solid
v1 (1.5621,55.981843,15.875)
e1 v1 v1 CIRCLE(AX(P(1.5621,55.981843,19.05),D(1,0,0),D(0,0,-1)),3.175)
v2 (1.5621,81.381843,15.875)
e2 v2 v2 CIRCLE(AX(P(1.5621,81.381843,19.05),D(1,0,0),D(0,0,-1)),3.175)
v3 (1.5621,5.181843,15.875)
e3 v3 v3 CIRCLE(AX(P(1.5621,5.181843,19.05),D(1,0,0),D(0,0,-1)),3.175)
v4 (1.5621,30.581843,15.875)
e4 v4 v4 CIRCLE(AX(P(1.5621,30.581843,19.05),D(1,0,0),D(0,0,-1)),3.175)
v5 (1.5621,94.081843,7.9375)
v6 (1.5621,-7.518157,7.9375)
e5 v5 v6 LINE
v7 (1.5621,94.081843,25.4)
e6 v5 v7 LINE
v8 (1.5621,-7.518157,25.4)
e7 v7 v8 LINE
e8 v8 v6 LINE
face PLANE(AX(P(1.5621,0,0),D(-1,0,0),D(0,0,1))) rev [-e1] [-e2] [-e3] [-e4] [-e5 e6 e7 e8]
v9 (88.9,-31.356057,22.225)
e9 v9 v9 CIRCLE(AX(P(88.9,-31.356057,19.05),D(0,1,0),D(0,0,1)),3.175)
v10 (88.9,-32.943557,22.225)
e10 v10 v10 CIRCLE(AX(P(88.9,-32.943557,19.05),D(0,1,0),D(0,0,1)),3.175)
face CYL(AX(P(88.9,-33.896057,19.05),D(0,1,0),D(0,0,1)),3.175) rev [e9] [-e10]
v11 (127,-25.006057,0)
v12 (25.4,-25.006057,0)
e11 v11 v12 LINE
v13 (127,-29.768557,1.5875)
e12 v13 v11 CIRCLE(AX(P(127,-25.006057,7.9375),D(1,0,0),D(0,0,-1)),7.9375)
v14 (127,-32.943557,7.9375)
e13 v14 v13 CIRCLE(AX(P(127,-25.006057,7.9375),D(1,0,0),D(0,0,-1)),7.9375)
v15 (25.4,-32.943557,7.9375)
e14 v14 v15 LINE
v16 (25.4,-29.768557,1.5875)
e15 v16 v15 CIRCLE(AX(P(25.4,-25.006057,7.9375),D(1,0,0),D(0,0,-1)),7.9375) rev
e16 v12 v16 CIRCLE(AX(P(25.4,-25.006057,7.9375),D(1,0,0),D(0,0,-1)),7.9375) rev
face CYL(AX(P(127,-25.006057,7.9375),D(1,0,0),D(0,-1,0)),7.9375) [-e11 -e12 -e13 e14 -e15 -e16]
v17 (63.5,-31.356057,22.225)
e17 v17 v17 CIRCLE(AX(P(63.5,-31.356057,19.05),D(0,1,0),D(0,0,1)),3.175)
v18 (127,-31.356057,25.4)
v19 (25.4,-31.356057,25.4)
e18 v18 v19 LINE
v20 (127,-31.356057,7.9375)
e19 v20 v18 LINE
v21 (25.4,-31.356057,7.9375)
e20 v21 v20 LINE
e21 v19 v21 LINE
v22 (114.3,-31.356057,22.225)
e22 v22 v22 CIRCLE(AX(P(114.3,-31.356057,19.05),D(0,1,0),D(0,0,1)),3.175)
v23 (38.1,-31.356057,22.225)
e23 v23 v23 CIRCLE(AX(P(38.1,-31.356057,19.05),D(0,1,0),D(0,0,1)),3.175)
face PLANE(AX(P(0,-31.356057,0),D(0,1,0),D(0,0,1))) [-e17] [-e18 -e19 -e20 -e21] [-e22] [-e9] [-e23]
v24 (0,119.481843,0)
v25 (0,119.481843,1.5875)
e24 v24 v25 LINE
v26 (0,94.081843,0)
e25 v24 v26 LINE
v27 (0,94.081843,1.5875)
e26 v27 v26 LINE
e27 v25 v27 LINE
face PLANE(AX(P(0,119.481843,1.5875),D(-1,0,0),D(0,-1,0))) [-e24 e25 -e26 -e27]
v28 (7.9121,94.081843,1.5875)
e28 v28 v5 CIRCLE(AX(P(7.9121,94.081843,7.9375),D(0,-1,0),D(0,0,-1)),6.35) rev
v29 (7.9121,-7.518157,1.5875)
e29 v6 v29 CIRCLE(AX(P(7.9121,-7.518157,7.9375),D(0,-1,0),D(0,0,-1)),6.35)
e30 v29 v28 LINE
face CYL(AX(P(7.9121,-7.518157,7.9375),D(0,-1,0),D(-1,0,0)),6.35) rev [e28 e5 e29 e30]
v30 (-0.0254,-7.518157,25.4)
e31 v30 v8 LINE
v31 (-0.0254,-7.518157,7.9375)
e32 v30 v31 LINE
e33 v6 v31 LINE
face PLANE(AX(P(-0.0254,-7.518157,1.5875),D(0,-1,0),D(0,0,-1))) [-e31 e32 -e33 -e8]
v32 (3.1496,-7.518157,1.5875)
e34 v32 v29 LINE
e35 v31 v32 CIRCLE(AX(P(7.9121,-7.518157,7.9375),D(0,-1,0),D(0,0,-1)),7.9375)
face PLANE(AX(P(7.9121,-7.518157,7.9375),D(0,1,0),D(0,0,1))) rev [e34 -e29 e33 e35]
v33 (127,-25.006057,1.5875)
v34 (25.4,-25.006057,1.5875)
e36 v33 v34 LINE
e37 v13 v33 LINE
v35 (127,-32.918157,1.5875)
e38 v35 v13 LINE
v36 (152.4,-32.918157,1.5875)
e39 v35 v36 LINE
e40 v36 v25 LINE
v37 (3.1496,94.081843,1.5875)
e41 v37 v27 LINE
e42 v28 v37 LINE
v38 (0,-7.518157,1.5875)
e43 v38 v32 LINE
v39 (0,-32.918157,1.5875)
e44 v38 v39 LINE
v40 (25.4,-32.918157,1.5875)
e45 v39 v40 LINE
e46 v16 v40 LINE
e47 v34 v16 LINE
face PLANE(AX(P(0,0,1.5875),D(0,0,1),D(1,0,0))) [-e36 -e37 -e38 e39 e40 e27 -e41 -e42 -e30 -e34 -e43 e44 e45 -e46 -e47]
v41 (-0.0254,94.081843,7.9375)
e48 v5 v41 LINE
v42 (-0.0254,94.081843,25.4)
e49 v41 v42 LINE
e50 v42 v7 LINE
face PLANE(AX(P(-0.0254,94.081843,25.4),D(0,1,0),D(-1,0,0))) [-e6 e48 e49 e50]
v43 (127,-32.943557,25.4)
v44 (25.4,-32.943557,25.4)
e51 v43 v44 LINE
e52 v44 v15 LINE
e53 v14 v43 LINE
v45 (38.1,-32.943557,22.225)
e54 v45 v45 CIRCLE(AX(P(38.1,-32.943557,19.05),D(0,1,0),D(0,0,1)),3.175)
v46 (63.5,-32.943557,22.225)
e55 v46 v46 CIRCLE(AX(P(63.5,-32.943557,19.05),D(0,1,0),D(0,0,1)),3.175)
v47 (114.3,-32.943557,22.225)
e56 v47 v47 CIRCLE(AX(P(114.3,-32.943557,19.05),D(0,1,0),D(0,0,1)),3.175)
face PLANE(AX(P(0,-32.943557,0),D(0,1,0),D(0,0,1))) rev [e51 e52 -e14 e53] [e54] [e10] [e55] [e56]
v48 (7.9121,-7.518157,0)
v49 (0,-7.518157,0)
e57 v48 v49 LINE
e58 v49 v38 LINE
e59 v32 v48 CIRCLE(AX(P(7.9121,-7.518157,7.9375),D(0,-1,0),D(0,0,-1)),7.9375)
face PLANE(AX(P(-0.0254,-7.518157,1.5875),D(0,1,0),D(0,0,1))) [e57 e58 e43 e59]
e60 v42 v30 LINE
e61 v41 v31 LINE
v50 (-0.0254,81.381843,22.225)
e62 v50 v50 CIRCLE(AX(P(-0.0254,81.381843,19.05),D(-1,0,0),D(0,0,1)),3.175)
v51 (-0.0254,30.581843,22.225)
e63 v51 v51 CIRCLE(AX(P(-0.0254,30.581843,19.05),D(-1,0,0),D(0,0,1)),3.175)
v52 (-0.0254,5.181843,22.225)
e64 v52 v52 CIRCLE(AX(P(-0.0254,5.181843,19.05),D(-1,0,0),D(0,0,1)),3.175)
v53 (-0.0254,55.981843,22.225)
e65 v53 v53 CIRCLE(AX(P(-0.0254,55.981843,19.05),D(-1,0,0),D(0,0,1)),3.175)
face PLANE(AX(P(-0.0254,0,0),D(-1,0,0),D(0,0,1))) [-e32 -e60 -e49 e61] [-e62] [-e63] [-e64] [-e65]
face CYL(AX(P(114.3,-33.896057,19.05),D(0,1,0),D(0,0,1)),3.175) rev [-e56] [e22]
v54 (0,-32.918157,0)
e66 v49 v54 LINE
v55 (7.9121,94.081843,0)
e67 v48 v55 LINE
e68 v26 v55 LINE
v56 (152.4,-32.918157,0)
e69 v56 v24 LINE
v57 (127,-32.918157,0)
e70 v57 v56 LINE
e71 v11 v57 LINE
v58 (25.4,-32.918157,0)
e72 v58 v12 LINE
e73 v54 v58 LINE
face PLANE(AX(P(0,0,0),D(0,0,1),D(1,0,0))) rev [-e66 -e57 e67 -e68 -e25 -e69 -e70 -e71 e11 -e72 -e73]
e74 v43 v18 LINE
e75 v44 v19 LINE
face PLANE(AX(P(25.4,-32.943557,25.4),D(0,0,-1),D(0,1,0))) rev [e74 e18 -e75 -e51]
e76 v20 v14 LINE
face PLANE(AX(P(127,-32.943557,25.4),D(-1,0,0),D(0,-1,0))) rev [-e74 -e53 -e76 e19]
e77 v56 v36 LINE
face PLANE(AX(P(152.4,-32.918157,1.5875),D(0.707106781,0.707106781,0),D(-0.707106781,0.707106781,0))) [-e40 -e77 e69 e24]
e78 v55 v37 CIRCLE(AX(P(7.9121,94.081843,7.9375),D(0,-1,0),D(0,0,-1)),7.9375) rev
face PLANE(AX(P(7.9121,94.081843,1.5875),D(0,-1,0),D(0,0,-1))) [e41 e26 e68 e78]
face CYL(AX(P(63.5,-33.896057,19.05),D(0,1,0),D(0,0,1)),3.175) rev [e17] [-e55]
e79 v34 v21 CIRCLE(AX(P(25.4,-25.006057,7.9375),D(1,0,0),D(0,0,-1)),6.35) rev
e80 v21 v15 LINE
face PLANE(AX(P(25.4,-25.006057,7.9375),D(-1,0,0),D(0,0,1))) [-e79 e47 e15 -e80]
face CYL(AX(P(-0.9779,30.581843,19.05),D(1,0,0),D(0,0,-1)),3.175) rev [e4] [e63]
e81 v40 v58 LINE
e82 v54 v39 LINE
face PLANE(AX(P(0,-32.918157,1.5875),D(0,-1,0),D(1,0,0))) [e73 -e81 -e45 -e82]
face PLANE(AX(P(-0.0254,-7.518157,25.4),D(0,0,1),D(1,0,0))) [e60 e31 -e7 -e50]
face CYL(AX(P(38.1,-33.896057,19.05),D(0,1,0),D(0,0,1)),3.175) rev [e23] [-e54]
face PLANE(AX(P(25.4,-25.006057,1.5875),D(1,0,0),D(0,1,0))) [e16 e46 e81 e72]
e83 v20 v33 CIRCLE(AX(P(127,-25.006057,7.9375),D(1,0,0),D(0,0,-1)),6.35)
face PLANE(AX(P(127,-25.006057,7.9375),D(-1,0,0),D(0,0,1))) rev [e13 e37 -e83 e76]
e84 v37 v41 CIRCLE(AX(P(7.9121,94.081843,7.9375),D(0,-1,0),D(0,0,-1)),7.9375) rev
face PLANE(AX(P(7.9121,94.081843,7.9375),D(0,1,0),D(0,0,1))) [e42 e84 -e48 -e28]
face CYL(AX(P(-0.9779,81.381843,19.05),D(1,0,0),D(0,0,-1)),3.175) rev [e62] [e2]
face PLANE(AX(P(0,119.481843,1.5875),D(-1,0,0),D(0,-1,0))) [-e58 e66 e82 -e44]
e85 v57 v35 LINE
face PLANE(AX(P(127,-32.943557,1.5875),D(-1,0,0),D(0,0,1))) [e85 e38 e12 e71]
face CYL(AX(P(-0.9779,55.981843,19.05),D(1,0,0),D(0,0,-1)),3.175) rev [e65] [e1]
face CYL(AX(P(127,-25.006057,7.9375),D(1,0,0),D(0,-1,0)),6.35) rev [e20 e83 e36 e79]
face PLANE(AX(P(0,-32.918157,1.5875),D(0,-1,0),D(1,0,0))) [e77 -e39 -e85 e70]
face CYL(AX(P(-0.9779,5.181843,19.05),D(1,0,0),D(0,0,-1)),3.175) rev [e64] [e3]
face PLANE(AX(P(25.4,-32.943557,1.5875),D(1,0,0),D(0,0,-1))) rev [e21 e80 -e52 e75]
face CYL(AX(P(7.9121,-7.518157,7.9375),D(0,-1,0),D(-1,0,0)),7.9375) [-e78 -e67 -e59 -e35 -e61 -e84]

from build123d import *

# Parameters (mm, degrees)
BOSS_EXTRUDE1_DEPTH          = 1.5875
SKETCH7_W                    = 1.5875
SKETCH7_H                    = 101.6
BOSS_EXTRUDE2_DEPTH          = 0.0254
EDGE_FLANGE1_STRIP_W         = 19.05
EDGE_FLANGE1_STRIP_H         = 1.5875
EDGE_FLANGE1_STRIP_CUT_DEPTH = 101.6
EDGE_FLANGE1_DEPTH           = 101.6
SKETCH11_W                   = 101.6
SKETCH11_H                   = 1.5875
BOSS_EXTRUDE3_DEPTH          = 0.0254
EDGE_FLANGE2_STRIP_W         = 19.05
EDGE_FLANGE2_STRIP_H         = 1.5875
EDGE_FLANGE2_STRIP_CUT_DEPTH = 101.6
EDGE_FLANGE2_DEPTH           = 101.6
SKETCH15_R                   = 3.175
CUT_EXTRUDE1_DEPTH           = 2.54
SKETCH16_R                   = 3.175
CUT_EXTRUDE2_DEPTH           = 2.54


# Sheet-metal steps are written as plain solids
with BuildPart() as part:
    # Sketch1 → Boss-Extrude1 (new body)
    with BuildSketch(Plane.XY):
        Polygon((0, 119.481843199), (0, -32.918156801), (152.4, -32.918156801), align=None)
    extrude(amount=BOSS_EXTRUDE1_DEPTH)

    # Sketch7 → Boss-Extrude2 (add)
    with BuildSketch(Plane.ZY):
        with Locations((0.79375, 43.281843199)):
            Rectangle(SKETCH7_W, SKETCH7_H)
    extrude(amount=BOSS_EXTRUDE2_DEPTH)

    # Edge-Flange1 strip (across the edge) → Edge-Flange1 strip cut (cut)
    with BuildSketch(Plane(origin=(-0.0254, 94.081843199, 1.5875), x_dir=(1, 0, 0), z_dir=(0, -1, 0))):
        with Locations((-1.5875, -0.79375)):
            Rectangle(EDGE_FLANGE1_STRIP_W, EDGE_FLANGE1_STRIP_H)
    extrude(amount=EDGE_FLANGE1_STRIP_CUT_DEPTH, mode=Mode.SUBTRACT)

    # Edge-Flange1 section (across the edge) → Edge-Flange1 (add)
    with BuildSketch(Plane(origin=(-0.0254, 94.081843199, 1.5875), x_dir=(1, 0, 0), z_dir=(0, -1, 0))):
        with BuildLine():
            Line((0, 6.35), (0, 23.8125))
            Line((0, 23.8125), (1.5875, 23.8125))
            Line((1.5875, 23.8125), (1.5875, 6.35))
            ThreePointArc((1.5875, 6.35), (3.447371939, 1.859871939), (7.9375, 0))
            Line((7.9375, 0), (7.9375, -1.5875))
            ThreePointArc((7.9375, -1.5875), (2.324839924, 0.737339924), (0, 6.35))
        make_face()
    extrude(amount=EDGE_FLANGE1_DEPTH)

    # Sketch11 → Boss-Extrude3 (add)
    with BuildSketch(Plane(origin=(0, -32.918156801, 0), x_dir=(-1, 0, 0), z_dir=(0, -1, 0))):
        with Locations((-76.2, -0.79375)):
            Rectangle(SKETCH11_W, SKETCH11_H)
    extrude(amount=BOSS_EXTRUDE3_DEPTH)

    # Edge-Flange2 strip (across the edge) → Edge-Flange2 strip cut (cut)
    with BuildSketch(Plane(origin=(25.4, -32.943556801, 1.5875), x_dir=(0, 1, 0), z_dir=(1, 0, 0))):
        with Locations((-1.5875, -0.79375)):
            Rectangle(EDGE_FLANGE2_STRIP_W, EDGE_FLANGE2_STRIP_H)
    extrude(amount=EDGE_FLANGE2_STRIP_CUT_DEPTH, mode=Mode.SUBTRACT)

    # Edge-Flange2 section (across the edge) → Edge-Flange2 (add)
    with BuildSketch(Plane(origin=(25.4, -32.943556801, 1.5875), x_dir=(0, 1, 0), z_dir=(1, 0, 0))):
        with BuildLine():
            Line((0, 6.35), (0, 23.8125))
            Line((0, 23.8125), (1.5875, 23.8125))
            Line((1.5875, 23.8125), (1.5875, 6.35))
            ThreePointArc((1.5875, 6.35), (3.447371939, 1.859871939), (7.9375, 0))
            Line((7.9375, 0), (7.9375, -1.5875))
            ThreePointArc((7.9375, -1.5875), (2.324839924, 0.737339924), (0, 6.35))
        make_face()
    extrude(amount=EDGE_FLANGE2_DEPTH)

    # Sketch15 → Cut-Extrude1 (cut)
    with BuildSketch(Plane(origin=(0, -31.356056801, 0), x_dir=(1, 0, 0), z_dir=(0, 1, 0))):
        with Locations(Location((38.1, -19.05, 0), (0, 0, 270))):
            Circle(SKETCH15_R)
        with Locations(Location((63.5, -19.05, 0), (0, 0, 270))):
            Circle(SKETCH15_R)
        with Locations(Location((88.9, -19.05, 0), (0, 0, 270))):
            Circle(SKETCH15_R)
        with Locations(Location((114.3, -19.05, 0), (0, 0, 270))):
            Circle(SKETCH15_R)
    extrude(amount=-CUT_EXTRUDE1_DEPTH, mode=Mode.SUBTRACT)

    # Sketch16 → Cut-Extrude2 (cut)
    with BuildSketch(Plane(origin=(1.5621, 0, 0), x_dir=(0, 0, -1), z_dir=(1, 0, 0))):
        with Locations((-19.05, 81.381843199)):
            Circle(SKETCH16_R)
        with Locations((-19.05, 55.981843199)):
            Circle(SKETCH16_R)
        with Locations((-19.05, 30.581843199)):
            Circle(SKETCH16_R)
        with Locations((-19.05, 5.181843199)):
            Circle(SKETCH16_R)
    extrude(amount=-CUT_EXTRUDE2_DEPTH, mode=Mode.SUBTRACT)


solid = part.part
